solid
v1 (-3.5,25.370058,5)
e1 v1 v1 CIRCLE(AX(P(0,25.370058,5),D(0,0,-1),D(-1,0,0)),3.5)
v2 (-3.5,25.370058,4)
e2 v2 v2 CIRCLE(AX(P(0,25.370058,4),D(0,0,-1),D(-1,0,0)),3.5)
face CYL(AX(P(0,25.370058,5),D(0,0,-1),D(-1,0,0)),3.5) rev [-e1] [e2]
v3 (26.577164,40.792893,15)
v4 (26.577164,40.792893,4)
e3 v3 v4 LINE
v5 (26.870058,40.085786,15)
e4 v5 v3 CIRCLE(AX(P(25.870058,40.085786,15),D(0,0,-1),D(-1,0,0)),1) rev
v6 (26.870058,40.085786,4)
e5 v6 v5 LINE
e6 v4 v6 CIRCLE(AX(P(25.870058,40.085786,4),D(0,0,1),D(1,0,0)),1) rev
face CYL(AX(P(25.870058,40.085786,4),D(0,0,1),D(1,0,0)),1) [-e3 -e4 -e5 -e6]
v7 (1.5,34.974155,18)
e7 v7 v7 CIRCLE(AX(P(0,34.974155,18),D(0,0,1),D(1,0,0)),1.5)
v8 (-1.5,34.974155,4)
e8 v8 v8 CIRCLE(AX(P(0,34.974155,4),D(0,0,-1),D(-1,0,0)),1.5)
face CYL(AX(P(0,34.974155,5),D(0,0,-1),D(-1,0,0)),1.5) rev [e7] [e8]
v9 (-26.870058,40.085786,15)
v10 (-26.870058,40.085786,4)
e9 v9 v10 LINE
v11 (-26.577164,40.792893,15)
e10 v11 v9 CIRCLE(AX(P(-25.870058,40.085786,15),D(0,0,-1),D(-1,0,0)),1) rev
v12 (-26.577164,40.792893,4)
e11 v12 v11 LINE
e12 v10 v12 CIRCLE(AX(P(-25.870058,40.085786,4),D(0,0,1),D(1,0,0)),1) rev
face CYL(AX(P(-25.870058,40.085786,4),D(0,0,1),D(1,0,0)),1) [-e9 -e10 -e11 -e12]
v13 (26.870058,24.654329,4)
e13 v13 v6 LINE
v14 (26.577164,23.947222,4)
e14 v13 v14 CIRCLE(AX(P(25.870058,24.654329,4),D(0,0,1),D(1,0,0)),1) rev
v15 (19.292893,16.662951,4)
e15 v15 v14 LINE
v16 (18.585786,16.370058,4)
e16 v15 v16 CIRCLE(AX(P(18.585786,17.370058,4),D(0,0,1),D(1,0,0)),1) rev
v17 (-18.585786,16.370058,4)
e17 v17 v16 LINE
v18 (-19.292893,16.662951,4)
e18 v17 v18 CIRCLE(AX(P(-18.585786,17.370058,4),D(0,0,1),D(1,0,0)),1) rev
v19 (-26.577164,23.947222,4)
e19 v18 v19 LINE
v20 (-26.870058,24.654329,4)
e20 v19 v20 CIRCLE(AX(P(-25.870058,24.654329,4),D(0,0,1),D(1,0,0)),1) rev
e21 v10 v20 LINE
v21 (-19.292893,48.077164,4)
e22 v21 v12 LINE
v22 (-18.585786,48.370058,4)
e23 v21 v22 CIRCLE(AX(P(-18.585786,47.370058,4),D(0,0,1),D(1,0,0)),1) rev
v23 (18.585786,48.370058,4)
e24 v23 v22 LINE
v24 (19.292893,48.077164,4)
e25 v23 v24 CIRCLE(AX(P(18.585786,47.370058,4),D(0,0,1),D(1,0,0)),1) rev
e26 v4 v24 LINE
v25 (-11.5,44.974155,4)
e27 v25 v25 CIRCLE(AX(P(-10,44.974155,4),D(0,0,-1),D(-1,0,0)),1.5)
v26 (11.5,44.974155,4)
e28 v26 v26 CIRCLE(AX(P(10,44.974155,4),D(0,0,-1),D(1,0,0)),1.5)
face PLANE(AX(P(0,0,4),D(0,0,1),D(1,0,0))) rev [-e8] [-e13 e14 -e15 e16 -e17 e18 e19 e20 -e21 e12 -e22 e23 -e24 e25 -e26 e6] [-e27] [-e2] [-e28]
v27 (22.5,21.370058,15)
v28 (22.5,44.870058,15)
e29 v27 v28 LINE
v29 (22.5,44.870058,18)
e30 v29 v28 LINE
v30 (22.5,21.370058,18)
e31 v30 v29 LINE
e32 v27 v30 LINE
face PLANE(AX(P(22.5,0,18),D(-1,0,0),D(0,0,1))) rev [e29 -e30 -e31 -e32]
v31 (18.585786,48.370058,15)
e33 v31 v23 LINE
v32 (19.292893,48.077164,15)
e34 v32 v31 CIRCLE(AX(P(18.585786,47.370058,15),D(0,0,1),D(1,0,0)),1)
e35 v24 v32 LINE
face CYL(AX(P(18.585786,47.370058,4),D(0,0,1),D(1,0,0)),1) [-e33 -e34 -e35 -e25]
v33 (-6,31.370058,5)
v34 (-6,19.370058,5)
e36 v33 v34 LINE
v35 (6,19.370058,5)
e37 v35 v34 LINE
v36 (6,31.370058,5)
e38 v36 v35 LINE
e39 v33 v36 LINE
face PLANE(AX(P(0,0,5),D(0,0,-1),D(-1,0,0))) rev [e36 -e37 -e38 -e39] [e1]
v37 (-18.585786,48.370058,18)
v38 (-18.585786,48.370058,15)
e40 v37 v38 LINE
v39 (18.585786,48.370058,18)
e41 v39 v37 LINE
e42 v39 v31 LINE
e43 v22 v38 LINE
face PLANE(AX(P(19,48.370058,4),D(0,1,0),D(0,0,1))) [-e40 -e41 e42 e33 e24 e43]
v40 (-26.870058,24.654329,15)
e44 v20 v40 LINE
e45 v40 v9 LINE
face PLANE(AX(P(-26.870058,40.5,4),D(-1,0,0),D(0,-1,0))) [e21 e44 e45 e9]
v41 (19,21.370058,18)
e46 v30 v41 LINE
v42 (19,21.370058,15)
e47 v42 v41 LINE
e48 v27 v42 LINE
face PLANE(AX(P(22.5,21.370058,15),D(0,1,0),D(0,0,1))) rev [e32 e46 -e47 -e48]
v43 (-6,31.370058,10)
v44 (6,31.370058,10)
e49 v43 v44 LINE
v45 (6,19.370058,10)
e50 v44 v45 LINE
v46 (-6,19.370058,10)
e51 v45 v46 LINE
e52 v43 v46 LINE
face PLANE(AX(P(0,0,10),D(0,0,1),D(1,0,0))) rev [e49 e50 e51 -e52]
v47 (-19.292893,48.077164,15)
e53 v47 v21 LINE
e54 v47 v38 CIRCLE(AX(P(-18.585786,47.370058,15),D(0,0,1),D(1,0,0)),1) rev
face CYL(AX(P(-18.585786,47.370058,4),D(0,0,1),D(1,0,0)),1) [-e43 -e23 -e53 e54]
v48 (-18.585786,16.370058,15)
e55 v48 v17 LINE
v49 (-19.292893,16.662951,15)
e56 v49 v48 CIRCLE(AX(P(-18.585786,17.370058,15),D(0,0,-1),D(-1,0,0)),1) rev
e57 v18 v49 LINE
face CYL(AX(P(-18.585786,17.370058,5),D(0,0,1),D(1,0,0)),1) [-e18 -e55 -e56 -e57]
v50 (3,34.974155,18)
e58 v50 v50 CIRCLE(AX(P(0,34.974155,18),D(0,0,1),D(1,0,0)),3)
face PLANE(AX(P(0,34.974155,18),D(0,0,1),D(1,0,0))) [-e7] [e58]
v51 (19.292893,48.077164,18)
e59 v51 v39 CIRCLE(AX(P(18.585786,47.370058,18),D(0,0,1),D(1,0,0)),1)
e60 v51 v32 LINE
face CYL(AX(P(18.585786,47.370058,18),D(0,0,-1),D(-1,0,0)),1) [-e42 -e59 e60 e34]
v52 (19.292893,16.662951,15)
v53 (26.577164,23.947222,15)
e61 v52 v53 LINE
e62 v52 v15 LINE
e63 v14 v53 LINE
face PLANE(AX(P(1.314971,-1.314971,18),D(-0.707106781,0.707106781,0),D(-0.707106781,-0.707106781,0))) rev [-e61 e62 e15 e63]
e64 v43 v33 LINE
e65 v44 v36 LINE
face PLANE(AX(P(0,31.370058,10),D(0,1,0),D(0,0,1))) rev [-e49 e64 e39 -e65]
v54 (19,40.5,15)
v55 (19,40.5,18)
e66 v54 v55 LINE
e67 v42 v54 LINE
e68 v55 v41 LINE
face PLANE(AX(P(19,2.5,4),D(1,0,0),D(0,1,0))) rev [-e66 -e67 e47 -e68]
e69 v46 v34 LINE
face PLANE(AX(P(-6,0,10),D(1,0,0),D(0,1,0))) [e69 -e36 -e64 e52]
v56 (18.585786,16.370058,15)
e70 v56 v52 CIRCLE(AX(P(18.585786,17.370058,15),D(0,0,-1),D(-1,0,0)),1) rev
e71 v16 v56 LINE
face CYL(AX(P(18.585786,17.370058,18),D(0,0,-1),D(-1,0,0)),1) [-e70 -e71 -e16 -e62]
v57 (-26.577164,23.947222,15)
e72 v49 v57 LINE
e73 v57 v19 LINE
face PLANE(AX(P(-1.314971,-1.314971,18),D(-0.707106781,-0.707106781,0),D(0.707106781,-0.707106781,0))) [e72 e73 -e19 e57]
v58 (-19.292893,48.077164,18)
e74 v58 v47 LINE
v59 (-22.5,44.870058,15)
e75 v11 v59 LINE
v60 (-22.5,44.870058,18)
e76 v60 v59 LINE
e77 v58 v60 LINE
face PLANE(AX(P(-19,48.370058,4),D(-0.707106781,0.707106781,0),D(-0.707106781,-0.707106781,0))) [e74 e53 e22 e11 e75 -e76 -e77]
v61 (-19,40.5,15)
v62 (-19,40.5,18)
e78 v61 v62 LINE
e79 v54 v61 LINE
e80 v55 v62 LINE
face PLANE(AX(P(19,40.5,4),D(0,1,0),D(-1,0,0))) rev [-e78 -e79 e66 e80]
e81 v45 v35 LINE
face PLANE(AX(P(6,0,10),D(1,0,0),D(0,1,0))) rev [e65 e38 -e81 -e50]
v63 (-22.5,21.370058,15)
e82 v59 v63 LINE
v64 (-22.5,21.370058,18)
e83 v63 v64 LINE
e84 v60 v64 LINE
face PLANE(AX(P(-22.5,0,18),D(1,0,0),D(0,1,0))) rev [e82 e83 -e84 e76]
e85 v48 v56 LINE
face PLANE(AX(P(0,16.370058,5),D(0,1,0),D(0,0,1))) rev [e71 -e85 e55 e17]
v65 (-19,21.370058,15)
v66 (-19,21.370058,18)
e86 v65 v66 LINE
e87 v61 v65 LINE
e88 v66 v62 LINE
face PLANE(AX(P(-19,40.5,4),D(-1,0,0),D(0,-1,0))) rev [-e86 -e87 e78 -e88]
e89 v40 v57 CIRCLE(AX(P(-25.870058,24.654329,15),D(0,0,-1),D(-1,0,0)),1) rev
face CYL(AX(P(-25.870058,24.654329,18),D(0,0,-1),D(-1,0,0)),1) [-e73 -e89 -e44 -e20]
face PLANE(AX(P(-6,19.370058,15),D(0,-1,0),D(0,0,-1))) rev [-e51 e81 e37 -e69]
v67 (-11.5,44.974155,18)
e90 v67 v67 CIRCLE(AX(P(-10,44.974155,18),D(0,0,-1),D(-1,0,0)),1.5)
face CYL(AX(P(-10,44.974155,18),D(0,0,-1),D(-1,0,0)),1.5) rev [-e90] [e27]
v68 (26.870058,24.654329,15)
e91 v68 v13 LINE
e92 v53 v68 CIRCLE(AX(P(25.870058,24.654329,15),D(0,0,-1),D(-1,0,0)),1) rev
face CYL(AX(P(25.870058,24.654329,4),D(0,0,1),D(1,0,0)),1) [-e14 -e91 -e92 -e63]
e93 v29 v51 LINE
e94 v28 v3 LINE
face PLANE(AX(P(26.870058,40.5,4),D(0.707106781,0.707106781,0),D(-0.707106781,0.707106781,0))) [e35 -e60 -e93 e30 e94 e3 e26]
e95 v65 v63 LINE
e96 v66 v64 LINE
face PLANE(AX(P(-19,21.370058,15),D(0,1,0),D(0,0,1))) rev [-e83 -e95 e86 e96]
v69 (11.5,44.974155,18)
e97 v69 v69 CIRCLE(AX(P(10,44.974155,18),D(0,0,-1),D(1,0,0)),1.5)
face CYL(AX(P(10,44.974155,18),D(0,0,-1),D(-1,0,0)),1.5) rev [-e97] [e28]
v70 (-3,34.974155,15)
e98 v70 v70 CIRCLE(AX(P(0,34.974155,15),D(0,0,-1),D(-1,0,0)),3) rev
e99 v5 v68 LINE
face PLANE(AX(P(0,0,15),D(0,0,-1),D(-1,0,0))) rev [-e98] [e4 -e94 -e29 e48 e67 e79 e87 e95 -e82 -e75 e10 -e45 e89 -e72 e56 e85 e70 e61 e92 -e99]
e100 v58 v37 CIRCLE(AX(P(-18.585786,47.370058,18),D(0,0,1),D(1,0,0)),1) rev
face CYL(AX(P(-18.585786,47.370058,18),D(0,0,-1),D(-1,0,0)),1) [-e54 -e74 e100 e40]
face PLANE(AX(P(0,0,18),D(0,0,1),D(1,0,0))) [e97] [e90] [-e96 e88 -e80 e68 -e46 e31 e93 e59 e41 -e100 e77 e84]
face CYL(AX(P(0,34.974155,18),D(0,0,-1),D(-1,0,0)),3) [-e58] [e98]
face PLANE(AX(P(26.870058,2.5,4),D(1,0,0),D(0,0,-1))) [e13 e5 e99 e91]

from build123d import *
from build123d.topology import SkipClean

# Parameters (mm, degrees)
CROQUIS3_W                   = 38
CROQUIS3_H                   = 38
SALIENTE_EXTRUIR9_DEPTH      = 1
SALIENTE_EXTRUIR10_START     = -11
SALIENTE_EXTRUIR10_OUTLINE_W = 38
SALIENTE_EXTRUIR10_OUTLINE_H = 38
SALIENTE_EXTRUIR10_DEPTH     = 10
CROQUIS13_W                  = 38
CROQUIS13_H                  = 38
SALIENTE_EXTRUIR15_DEPTH     = 3
CROQUIS14_R                  = 1.5
CORTAR_EXTRUIR1_DEPTH        = 14
CROQUIS15_W                  = 38
CROQUIS15_H                  = 24.129942315
CROQUIS15_R                  = 1.5
CROQUIS15_R_2                = 3.5
SALIENTE_EXTRUIR16_DEPTH     = 1
CORTAR_EXTRUIR2_DEPTH        = 14
CROQUIS17_R                  = 1.5
SALIENTE_EXTRUIR17_DEPTH     = 5
CROQUIS18_R                  = 1.5
CROQUIS18_W                  = 12
CROQUIS18_H                  = 12
SALIENTE_EXTRUIR18_DEPTH     = 5
CORTAR_EXTRUIR3_DEPTH        = 3
CROQUIS20_R                  = 3
CROQUIS20_R_2                = 1.5
SALIENTE_EXTRUIR19_DEPTH     = 3
REDONDEO11_R                 = 1
CROQUIS21_W                  = 12
CROQUIS21_H                  = 3
SALIENTE_EXTRUIR20_DEPTH     = 10


# Read off the part's stored shape, not the designer's step: Saliente-Extruir10
with BuildPart() as part:
    # Croquis3 → Saliente-Extruir9 (new body)
    with BuildSketch(Plane.XY.offset(5)):
        Polygon((19, -5.370057685), (26.870057685, 2.5), (26.870057685, 40.5), (19, 48.370057685), (-19, 48.370057685), (-26.870057685, 40.5), (-26.870057685, 2.5), (-19, -5.370057685), align=None)
        with Locations((0, 21.5)):
            Rectangle(CROQUIS3_W, CROQUIS3_H, mode=Mode.SUBTRACT)
    extrude(amount=-SALIENTE_EXTRUIR9_DEPTH)

    # Saliente-Extruir10 outline → Saliente-Extruir10 (add)
    with BuildSketch(Plane(origin=(0, 0, 4), x_dir=(-1, 0, 0), z_dir=(0, 0, -1)).offset(SALIENTE_EXTRUIR10_START)):
        Polygon((-26.870057685, 2.5), (-19, -5.370057685), (19, -5.370057685), (26.870057685, 2.5), (26.870057685, 40.5), (19, 48.370057685), (-19, 48.370057685), (-26.870057685, 40.5), align=None)
        with Locations((0, 21.5)):
            Rectangle(SALIENTE_EXTRUIR10_OUTLINE_W, SALIENTE_EXTRUIR10_OUTLINE_H, mode=Mode.SUBTRACT)
    extrude(amount=SALIENTE_EXTRUIR10_DEPTH)

    # Croquis13 → Saliente-Extruir15 (add)
    with BuildSketch(Plane.XY.offset(15)):
        with BuildLine():
            Line((-22.5, 44.870057685), (-22.5, -1))
            Line((-22.5, -1), (22.5, -1))
            Line((22.5, -1), (22.5, 44.870057685))
            Line((22.5, 44.870057685), (19.292893219, 48.077164466))
            ThreePointArc((19.292893219, 48.077164466), (18.96846987, 48.293937218), (18.585786438, 48.370057685))
            Line((18.585786438, 48.370057685), (-18.585786438, 48.370057685))
            ThreePointArc((-18.585786438, 48.370057685), (-18.96846987, 48.293937218), (-19.292893219, 48.077164466))
            Line((-19.292893219, 48.077164466), (-22.5, 44.870057685))
        make_face()
        with Locations((0, 21.5)):
            Rectangle(CROQUIS13_W, CROQUIS13_H, mode=Mode.SUBTRACT)
    extrude(amount=SALIENTE_EXTRUIR15_DEPTH)

    # Croquis14 → Cortar-Extruir1 (cut)
    with BuildSketch(Plane(origin=(0, 0, 4), x_dir=(-1, 0, 0), z_dir=(0, 0, -1))):
        with Locations((10, 44.97415474)):
            Circle(CROQUIS14_R)
        with Locations(Location((-10, 44.97415474, 0), (0, 0, 180))):
            Circle(CROQUIS14_R)
    extrude(amount=-CORTAR_EXTRUIR1_DEPTH, mode=Mode.SUBTRACT)

    # Croquis15 → Saliente-Extruir16 (add)
    with BuildSketch(Plane(origin=(0, 0, 4), x_dir=(-1, 0, 0), z_dir=(0, 0, -1))):
        with Locations((0, 28.435028843)):
            Rectangle(CROQUIS15_W, CROQUIS15_H)
        with Locations((0, 34.97415474)):
            Circle(CROQUIS15_R, mode=Mode.SUBTRACT)
        with Locations((0, 25.370057685)):
            Circle(CROQUIS15_R_2, mode=Mode.SUBTRACT)
    extrude(amount=-SALIENTE_EXTRUIR16_DEPTH)

    # Croquis16 → Cortar-Extruir2 (cut)
    with BuildSketch(Plane(origin=(0, 0, 4), x_dir=(-1, 0, 0), z_dir=(0, 0, -1))):
        Polygon((-19, 2.5), (-19, 16.370057685), (-26.870057685, 24.24011537), (-26.870057685, 2.5), (-19, -5.370057685), (19, -5.370057685), (26.870057685, 2.5), (26.870057685, 24.24011537), (19, 16.370057685), (19, 2.5), align=None)
    extrude(amount=-CORTAR_EXTRUIR2_DEPTH, mode=Mode.SUBTRACT)

    # Croquis17 → Saliente-Extruir17 (add)
    with SkipClean():  # the faces are left unmerged after this step: merging them gives an invalid solid
        with BuildSketch(Plane.XY.offset(5)):
            Polygon((6, 31.370057685), (6, 25.370057685), (6, 19.370057685), (6, 16.370057685), (19, 16.370057685), (19, 40.5), (-19, 40.5), (-19, 16.370057685), (-6, 16.370057685), (-6, 19.370057685), (-6, 31.370057685), align=None)
            with Locations((0, 34.97415474)):
                Circle(CROQUIS17_R, mode=Mode.SUBTRACT)
        extrude(amount=SALIENTE_EXTRUIR17_DEPTH)
    add(part.part.scale(1), mode=Mode.REPLACE)  # the faces are merged on a copy

    # Croquis18 → Saliente-Extruir18 (add)
    # profile 1 of 2: a face of its own
    with BuildSketch(Plane.XY.offset(10)):
        Polygon((-6, 31.370057685), (6, 31.370057685), (6, 16.370057685), (19, 16.370057685), (19, 40.5), (-19, 40.5), (-19, 16.370057685), (-6, 16.370057685), align=None)
        with Locations(Location((0, 34.97415474, 0), (0, 0, 180))):
            Circle(CROQUIS18_R, mode=Mode.SUBTRACT)
    # profile 2 of 2: a face of its own
    with BuildSketch(Plane.XY.offset(10)):
        with Locations((0, 25.370057685)):
            Rectangle(CROQUIS18_W, CROQUIS18_H)
    extrude(amount=SALIENTE_EXTRUIR18_DEPTH)

    # Croquis19 → Cortar-Extruir3 (cut)
    with BuildSketch(Plane.XY.offset(18)):
        Polygon((-22.5, 19.870057685), (-19, 16.370057685), (-19, 21.370057685), (-22.5, 21.370057685), align=None)
        Polygon((19, 16.370057685), (22.5, 19.870057685), (22.5, 21.370057685), (19, 21.370057685), align=None)
    extrude(amount=-CORTAR_EXTRUIR3_DEPTH, mode=Mode.SUBTRACT)

    # Croquis20 → Saliente-Extruir19 (add)
    with BuildSketch(Plane.XY.offset(15)):
        with Locations(Location((0, 34.97415474, 0), (0, 0, 180))):
            Circle(CROQUIS20_R)
        with Locations(Location((0, 34.97415474, 0), (0, 0, 180))):
            Circle(CROQUIS20_R_2, mode=Mode.SUBTRACT)
    extrude(amount=SALIENTE_EXTRUIR19_DEPTH)

    # Redondeo11
    redondeo11_edges = [part.edges().sort_by_distance(p)[0] for p in [
        (26.870057685, 40.5, 10),
        (19, 48.370057685, 10),
        (-19, 48.370057685, 10),
        (-26.870057685, 40.5, 10),
        (26.870057685, 24.24011537, 9.5),
        (19, 16.370057685, 9.5),
        (-26.870057685, 24.24011537, 9.5),
        (-19, 16.370057685, 9.5),
    ]]
    fillet(redondeo11_edges, radius=REDONDEO11_R)

    # Croquis21 → Saliente-Extruir20 (add)
    with BuildSketch(Plane.XY.offset(5)):
        with Locations((0, 17.870057685)):
            Rectangle(CROQUIS21_W, CROQUIS21_H)
    extrude(amount=SALIENTE_EXTRUIR20_DEPTH)


solid = part.part
